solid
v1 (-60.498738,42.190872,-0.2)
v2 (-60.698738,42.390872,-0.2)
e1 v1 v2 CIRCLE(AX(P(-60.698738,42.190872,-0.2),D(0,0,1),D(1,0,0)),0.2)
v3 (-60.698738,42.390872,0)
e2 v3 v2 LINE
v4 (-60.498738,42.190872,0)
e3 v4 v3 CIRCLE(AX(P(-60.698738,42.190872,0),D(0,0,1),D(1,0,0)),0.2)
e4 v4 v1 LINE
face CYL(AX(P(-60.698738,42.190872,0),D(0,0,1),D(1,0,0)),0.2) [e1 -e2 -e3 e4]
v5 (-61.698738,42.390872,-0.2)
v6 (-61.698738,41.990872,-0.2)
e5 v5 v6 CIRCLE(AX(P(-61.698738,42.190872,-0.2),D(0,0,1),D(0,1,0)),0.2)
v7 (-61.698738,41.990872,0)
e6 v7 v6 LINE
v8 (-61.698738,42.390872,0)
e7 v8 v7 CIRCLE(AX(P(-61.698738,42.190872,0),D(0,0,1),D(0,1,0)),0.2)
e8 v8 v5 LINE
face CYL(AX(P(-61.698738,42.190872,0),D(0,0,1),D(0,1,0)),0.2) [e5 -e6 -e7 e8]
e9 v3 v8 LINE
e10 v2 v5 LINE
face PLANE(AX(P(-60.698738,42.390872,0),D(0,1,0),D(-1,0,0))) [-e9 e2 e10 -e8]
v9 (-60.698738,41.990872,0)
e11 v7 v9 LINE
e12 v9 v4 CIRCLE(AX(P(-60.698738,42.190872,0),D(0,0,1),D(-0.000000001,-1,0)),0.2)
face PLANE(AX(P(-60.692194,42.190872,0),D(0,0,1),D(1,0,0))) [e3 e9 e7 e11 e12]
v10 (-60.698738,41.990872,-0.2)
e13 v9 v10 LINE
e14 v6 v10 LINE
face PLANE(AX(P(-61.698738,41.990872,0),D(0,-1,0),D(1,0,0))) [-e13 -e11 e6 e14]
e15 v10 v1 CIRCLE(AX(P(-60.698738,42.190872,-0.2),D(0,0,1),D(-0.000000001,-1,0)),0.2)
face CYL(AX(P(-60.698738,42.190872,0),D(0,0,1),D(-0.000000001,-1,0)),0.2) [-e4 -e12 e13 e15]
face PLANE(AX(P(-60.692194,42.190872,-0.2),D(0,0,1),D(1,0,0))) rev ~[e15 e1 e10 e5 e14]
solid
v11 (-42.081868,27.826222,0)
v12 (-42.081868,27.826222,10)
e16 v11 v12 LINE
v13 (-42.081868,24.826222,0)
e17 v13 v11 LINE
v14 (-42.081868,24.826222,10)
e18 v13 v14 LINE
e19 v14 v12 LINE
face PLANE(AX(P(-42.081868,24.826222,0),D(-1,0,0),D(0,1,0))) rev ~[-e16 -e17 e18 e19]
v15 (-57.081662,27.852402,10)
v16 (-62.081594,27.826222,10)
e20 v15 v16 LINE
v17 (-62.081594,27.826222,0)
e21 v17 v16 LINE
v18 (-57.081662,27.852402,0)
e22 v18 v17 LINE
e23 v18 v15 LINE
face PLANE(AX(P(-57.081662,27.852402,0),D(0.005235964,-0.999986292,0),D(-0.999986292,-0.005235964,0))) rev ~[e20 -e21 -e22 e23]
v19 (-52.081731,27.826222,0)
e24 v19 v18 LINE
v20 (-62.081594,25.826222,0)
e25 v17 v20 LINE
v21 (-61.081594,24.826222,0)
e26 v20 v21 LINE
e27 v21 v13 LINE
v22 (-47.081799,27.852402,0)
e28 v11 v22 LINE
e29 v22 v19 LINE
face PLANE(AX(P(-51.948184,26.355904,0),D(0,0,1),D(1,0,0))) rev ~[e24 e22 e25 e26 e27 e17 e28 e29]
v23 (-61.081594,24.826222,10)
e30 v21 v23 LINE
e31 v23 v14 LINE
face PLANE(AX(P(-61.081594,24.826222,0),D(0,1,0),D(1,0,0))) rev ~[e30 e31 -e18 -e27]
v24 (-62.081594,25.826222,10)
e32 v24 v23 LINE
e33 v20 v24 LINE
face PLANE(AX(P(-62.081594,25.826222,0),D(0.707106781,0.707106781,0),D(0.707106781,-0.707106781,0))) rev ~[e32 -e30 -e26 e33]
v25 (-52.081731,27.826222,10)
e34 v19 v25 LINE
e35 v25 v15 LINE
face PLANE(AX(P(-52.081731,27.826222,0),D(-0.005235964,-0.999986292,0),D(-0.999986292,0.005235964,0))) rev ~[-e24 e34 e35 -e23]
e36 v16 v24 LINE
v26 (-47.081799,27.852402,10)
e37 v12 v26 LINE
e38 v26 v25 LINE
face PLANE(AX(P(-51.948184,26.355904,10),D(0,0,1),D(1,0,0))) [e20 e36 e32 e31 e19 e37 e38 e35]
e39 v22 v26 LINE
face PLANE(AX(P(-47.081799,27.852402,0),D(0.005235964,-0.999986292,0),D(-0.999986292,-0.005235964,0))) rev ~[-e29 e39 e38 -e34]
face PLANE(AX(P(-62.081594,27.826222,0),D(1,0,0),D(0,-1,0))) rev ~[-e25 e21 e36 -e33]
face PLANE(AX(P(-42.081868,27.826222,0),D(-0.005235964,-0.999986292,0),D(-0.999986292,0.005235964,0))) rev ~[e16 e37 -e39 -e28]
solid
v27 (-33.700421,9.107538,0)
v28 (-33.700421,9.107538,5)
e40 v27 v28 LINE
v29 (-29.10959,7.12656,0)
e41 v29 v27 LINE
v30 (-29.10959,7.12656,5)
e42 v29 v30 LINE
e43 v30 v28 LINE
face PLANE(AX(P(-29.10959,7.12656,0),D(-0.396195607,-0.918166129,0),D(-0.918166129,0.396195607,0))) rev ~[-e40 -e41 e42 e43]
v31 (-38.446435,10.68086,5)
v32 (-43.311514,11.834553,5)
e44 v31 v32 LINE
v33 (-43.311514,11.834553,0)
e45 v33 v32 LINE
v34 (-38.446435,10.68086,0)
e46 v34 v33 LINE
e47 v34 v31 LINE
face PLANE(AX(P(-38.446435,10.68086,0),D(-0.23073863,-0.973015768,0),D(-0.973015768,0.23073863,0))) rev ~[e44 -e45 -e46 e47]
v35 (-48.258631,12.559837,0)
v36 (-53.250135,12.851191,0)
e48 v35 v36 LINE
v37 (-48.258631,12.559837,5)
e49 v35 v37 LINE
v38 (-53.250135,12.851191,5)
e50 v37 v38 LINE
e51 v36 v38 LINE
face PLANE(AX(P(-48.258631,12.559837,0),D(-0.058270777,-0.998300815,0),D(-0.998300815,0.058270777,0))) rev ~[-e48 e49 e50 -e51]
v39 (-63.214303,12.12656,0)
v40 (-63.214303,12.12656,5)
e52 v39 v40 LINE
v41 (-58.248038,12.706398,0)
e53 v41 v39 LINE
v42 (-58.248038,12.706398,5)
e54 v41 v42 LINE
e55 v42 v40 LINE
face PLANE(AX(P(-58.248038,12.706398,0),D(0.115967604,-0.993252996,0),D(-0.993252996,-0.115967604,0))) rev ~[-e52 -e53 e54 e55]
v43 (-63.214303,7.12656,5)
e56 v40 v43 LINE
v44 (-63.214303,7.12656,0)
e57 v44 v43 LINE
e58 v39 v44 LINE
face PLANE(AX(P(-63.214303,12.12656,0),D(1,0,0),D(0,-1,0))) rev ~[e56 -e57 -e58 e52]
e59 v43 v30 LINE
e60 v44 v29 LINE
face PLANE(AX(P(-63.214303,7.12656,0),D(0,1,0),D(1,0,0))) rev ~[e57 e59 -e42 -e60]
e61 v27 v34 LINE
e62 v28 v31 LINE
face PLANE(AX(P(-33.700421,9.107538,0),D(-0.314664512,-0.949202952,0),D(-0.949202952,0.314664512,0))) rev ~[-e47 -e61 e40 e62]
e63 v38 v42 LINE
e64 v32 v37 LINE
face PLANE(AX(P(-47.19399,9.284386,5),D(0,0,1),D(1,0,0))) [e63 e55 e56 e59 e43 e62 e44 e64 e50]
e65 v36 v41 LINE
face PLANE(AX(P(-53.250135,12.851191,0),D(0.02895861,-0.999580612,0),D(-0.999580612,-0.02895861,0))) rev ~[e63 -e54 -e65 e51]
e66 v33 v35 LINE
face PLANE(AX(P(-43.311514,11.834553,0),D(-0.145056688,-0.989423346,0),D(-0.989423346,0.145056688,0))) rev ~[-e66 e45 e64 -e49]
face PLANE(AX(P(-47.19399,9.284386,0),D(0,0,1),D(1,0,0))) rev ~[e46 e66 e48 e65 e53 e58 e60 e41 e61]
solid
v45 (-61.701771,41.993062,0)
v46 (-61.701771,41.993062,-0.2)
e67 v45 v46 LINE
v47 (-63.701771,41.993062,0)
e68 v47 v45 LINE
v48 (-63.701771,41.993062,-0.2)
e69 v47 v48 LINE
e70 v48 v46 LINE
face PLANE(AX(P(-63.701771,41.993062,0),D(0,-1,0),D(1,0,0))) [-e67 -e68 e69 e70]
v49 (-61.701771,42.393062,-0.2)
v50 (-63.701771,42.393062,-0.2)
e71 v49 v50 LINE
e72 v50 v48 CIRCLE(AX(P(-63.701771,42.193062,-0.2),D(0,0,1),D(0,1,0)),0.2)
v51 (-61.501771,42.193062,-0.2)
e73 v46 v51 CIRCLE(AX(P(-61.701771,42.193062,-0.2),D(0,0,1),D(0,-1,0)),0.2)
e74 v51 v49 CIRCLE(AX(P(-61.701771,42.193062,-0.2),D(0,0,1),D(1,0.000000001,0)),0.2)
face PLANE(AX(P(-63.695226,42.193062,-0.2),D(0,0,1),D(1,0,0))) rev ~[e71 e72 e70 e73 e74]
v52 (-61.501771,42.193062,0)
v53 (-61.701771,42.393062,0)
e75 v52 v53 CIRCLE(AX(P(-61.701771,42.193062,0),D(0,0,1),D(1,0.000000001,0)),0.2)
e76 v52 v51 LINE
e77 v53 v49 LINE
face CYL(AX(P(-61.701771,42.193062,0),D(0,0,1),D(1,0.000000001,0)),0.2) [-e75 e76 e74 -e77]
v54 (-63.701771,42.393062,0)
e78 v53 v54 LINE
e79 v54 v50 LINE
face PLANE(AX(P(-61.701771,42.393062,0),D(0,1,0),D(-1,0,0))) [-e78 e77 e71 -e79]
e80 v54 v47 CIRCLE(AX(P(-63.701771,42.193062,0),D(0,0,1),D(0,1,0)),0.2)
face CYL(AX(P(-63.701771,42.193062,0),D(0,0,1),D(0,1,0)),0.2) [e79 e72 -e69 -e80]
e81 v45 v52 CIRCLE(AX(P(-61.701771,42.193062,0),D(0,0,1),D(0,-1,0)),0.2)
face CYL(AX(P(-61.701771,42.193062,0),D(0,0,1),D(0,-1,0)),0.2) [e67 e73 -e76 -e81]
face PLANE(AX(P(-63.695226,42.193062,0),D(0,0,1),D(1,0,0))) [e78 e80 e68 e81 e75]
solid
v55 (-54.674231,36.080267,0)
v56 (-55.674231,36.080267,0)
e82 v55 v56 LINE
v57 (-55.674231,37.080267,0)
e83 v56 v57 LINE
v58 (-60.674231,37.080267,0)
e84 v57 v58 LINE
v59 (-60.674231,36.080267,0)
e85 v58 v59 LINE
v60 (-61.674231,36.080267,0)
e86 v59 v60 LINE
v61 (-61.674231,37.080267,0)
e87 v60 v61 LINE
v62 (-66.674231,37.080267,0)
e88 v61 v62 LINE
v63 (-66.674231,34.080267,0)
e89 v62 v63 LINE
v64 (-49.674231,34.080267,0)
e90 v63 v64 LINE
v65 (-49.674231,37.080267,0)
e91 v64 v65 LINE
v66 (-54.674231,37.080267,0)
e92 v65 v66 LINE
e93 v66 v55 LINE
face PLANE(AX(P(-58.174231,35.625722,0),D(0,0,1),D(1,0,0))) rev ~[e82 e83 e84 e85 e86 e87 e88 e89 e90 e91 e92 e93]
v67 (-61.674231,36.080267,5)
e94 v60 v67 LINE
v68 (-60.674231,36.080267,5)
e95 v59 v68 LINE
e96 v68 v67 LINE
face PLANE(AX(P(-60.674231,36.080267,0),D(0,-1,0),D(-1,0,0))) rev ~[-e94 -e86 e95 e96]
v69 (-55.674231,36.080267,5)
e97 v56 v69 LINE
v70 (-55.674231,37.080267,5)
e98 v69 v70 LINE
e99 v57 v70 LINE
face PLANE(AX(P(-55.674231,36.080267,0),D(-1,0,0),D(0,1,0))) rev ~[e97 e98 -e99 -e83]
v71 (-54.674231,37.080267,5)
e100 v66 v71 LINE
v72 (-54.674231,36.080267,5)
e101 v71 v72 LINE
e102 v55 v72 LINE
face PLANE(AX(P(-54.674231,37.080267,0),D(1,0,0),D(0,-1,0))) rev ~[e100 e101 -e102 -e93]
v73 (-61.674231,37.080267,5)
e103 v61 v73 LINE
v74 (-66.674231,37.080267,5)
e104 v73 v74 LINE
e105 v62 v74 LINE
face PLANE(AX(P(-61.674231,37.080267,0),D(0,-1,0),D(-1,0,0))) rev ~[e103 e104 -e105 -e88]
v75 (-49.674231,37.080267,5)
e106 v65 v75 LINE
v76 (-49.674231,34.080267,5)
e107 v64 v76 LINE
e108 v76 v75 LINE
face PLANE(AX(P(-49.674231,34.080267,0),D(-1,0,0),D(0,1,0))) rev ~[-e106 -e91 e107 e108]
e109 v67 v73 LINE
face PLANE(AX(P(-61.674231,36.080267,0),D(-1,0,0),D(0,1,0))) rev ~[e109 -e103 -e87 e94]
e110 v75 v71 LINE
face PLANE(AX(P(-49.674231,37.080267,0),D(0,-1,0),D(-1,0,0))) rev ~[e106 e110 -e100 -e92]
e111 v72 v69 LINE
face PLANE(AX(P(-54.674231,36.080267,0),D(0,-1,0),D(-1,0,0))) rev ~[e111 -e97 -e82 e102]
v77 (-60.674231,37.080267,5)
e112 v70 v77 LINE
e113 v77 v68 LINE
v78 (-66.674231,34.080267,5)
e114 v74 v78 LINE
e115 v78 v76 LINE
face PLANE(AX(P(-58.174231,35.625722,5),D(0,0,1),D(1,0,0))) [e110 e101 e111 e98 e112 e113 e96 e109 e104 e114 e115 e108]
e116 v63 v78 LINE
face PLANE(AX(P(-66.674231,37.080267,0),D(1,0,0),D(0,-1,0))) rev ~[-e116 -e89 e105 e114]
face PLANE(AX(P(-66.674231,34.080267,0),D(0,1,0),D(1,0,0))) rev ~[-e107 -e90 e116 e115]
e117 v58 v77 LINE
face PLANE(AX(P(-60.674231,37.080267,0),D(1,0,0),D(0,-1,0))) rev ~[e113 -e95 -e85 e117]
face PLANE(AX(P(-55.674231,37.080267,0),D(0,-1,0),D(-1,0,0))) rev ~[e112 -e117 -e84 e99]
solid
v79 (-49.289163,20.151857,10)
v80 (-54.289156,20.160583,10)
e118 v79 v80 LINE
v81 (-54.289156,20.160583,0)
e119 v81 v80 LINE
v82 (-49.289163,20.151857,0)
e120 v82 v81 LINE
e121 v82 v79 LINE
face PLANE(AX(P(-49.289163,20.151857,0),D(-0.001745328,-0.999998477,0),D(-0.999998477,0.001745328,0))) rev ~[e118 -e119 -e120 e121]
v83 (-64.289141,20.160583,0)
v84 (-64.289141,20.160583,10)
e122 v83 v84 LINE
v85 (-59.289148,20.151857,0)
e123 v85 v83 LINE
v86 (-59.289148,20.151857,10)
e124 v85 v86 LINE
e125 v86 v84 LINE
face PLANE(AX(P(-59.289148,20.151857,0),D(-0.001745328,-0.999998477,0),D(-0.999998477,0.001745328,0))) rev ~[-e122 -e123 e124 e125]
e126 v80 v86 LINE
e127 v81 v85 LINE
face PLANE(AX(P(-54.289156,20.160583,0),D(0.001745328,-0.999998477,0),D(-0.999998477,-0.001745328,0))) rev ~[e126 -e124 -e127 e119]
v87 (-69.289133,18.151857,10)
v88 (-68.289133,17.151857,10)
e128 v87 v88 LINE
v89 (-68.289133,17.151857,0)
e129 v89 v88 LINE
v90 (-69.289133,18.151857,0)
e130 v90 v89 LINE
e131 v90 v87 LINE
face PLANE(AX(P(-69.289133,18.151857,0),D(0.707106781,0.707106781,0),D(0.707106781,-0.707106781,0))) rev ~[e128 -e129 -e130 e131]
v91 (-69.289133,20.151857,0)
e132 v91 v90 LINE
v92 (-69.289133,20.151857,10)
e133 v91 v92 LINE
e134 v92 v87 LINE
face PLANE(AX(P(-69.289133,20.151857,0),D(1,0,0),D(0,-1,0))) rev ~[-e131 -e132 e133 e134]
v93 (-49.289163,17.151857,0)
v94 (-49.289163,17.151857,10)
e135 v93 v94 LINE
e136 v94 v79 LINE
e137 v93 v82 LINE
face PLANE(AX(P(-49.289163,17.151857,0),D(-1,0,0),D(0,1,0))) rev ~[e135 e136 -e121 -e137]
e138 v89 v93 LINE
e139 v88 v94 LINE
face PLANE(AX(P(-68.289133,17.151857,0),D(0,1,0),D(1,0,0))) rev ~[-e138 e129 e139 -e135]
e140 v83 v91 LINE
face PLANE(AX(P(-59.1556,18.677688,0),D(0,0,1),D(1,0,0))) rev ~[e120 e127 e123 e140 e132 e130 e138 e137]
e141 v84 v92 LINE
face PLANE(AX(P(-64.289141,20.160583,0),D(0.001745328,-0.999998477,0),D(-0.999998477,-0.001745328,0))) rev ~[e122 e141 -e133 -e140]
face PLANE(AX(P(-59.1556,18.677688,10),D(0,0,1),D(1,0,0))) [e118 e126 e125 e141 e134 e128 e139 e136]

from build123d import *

# Parameters (mm, degrees)
F1_DEPTH  = 0.2
F3_DEPTH  = 0.2
F5_DEPTH  = 5
F7_DEPTH  = 10
F9_DEPTH  = 10
F11_DEPTH = 5


# Not quite as in the source:
# - a feature names something its author has since deleted; it is built from what else it names


with BuildPart() as f1:
    # F0 (on Top) → F1 (new body)
    with BuildSketch(Plane.XY):
        with BuildLine():
            ThreePointArc((-63.7017709232, 41.993062175), (-63.560349567, 42.0516408187), (-63.5017709232, 42.193062175))
            ThreePointArc((-63.5017709232, 42.193062175), (-63.560349567, 42.3344835312), (-63.7017709232, 42.393062175))
            ThreePointArc((-63.7017709232, 42.393062175), (-63.9017709232, 42.193062175), (-63.7017709232, 41.993062175))
        make_face()
        with BuildLine():
            ThreePointArc((-63.7017709232, 42.393062175), (-63.560349567, 42.3344835312), (-63.5017709232, 42.193062175))
            ThreePointArc((-63.5017709232, 42.193062175), (-63.560349567, 42.0516408187), (-63.7017709232, 41.993062175))
            Line((-63.7017709232, 41.993062175), (-61.7017709232, 41.993062175))
            ThreePointArc((-61.7017709232, 41.993062175), (-61.9017709232, 42.193062175), (-61.7017709232, 42.393062175))
            Line((-61.7017709232, 42.393062175), (-63.7017709232, 42.393062175))
        make_face()
        with BuildLine():
            ThreePointArc((-61.5017709232, 42.193062175), (-61.560349567, 42.3344835312), (-61.7017709232, 42.393062175))
            ThreePointArc((-61.7017709232, 42.393062175), (-61.9017709232, 42.193062175), (-61.7017709232, 41.993062175))
            ThreePointArc((-61.7017709232, 41.993062175), (-61.560349567, 42.0516408187), (-61.5017709232, 42.193062175))
        make_face()
    extrude(amount=-F1_DEPTH)


with BuildPart() as f3:
    # F2 (on Top) → F3 (new body)
    with BuildSketch(Plane.XY):
        with BuildLine():
            ThreePointArc((-60.6987384856, 41.9908721328), (-60.5573171293, 42.0494507765), (-60.4987384856, 42.1908721328))
            ThreePointArc((-60.4987384856, 42.1908721328), (-60.5573171293, 42.332293489), (-60.6987384856, 42.3908721328))
            ThreePointArc((-60.6987384856, 42.3908721328), (-60.8987384856, 42.1908721328), (-60.6987384856, 41.9908721328))
        make_face()
        with BuildLine():
            ThreePointArc((-60.6987384856, 41.9908721328), (-60.8987384856, 42.1908721328), (-60.6987384856, 42.3908721328))
            Line((-60.6987384856, 42.3908721328), (-61.6987384856, 42.3908721328))
            ThreePointArc((-61.6987384856, 42.3908721328), (-61.5573171293, 42.332293489), (-61.4987384856, 42.1908721328))
            ThreePointArc((-61.4987384856, 42.1908721328), (-61.5573171293, 42.0494507765), (-61.6987384856, 41.9908721328))
            Line((-61.6987384856, 41.9908721328), (-60.6987384856, 41.9908721328))
        make_face()
        with BuildLine():
            ThreePointArc((-61.4987384856, 42.1908721328), (-61.5573171293, 42.332293489), (-61.6987384856, 42.3908721328))
            ThreePointArc((-61.6987384856, 42.3908721328), (-61.8987384856, 42.1908721328), (-61.6987384856, 41.9908721328))
            ThreePointArc((-61.6987384856, 41.9908721328), (-61.5573171293, 42.0494507765), (-61.4987384856, 42.1908721328))
        make_face()
    extrude(amount=-F3_DEPTH)


with BuildPart() as f5:
    # F4 (on Top) → F5 (new body)
    with BuildSketch(Plane.XY):
        Polygon((-61.6742311418, 37.0802673395), (-66.6742311418, 37.0802673395), (-66.6742311418, 34.0802673395), (-49.6742311418, 34.0802673395), (-49.6742311418, 37.0802673395), (-54.6742311418, 37.0802673395), (-54.6742311418, 36.0802673395), (-55.6742311418, 36.0802673395), (-55.6742311418, 37.0802673395), (-60.6742311418, 37.0802673395), (-60.6742311418, 36.0802673395), (-61.6742311418, 36.0802673395), align=None)
    extrude(amount=F5_DEPTH)


with BuildPart() as f7:
    # F6 (on Top) → F7 (new body)
    with BuildSketch(Plane.XY):
        Polygon((-57.0816621606, 27.8524017553), (-62.0815936218, 27.8262219362), (-62.0815936218, 25.8262219362), (-61.0815936218, 24.8262219362), (-42.0818677769, 24.8262219362), (-42.0818677769, 27.8262219362), (-47.0817992381, 27.8524017553), (-52.0817306994, 27.8262219362), align=None)
    extrude(amount=F7_DEPTH)


with BuildPart() as f9:
    # F8 (on Top) → F9 (new body)
    with BuildSketch(Plane.XY):
        Polygon((-64.2891405681, 20.1605834368), (-69.2891329527, 20.151856795), (-69.2891329527, 18.151856795), (-68.2891329527, 17.151856795), (-49.2891634144, 17.151856795), (-49.2891634144, 20.151856795), (-54.289155799, 20.1605834368), (-59.2891481836, 20.151856795), align=None)
    extrude(amount=F9_DEPTH)


with BuildPart() as f11:
    # F10 (on Top) → F11 (new body)
    with BuildSketch(Plane.XY):
        Polygon((-63.2143030609, 7.1265595207), (-29.1095899709, 7.1265595207), (-33.7004206177, 9.1075375551), (-38.4464353798, 10.6808601151), (-43.3115142192, 11.834553266), (-48.2586309483, 12.5598367065), (-53.2501350215, 12.8511905915), (-58.2480380791, 12.7063975421), (-63.2143030609, 12.1265595207), align=None)
    extrude(amount=F11_DEPTH)


solid = Compound([f1.part, f3.part, f5.part, f7.part, f9.part, f11.part])
